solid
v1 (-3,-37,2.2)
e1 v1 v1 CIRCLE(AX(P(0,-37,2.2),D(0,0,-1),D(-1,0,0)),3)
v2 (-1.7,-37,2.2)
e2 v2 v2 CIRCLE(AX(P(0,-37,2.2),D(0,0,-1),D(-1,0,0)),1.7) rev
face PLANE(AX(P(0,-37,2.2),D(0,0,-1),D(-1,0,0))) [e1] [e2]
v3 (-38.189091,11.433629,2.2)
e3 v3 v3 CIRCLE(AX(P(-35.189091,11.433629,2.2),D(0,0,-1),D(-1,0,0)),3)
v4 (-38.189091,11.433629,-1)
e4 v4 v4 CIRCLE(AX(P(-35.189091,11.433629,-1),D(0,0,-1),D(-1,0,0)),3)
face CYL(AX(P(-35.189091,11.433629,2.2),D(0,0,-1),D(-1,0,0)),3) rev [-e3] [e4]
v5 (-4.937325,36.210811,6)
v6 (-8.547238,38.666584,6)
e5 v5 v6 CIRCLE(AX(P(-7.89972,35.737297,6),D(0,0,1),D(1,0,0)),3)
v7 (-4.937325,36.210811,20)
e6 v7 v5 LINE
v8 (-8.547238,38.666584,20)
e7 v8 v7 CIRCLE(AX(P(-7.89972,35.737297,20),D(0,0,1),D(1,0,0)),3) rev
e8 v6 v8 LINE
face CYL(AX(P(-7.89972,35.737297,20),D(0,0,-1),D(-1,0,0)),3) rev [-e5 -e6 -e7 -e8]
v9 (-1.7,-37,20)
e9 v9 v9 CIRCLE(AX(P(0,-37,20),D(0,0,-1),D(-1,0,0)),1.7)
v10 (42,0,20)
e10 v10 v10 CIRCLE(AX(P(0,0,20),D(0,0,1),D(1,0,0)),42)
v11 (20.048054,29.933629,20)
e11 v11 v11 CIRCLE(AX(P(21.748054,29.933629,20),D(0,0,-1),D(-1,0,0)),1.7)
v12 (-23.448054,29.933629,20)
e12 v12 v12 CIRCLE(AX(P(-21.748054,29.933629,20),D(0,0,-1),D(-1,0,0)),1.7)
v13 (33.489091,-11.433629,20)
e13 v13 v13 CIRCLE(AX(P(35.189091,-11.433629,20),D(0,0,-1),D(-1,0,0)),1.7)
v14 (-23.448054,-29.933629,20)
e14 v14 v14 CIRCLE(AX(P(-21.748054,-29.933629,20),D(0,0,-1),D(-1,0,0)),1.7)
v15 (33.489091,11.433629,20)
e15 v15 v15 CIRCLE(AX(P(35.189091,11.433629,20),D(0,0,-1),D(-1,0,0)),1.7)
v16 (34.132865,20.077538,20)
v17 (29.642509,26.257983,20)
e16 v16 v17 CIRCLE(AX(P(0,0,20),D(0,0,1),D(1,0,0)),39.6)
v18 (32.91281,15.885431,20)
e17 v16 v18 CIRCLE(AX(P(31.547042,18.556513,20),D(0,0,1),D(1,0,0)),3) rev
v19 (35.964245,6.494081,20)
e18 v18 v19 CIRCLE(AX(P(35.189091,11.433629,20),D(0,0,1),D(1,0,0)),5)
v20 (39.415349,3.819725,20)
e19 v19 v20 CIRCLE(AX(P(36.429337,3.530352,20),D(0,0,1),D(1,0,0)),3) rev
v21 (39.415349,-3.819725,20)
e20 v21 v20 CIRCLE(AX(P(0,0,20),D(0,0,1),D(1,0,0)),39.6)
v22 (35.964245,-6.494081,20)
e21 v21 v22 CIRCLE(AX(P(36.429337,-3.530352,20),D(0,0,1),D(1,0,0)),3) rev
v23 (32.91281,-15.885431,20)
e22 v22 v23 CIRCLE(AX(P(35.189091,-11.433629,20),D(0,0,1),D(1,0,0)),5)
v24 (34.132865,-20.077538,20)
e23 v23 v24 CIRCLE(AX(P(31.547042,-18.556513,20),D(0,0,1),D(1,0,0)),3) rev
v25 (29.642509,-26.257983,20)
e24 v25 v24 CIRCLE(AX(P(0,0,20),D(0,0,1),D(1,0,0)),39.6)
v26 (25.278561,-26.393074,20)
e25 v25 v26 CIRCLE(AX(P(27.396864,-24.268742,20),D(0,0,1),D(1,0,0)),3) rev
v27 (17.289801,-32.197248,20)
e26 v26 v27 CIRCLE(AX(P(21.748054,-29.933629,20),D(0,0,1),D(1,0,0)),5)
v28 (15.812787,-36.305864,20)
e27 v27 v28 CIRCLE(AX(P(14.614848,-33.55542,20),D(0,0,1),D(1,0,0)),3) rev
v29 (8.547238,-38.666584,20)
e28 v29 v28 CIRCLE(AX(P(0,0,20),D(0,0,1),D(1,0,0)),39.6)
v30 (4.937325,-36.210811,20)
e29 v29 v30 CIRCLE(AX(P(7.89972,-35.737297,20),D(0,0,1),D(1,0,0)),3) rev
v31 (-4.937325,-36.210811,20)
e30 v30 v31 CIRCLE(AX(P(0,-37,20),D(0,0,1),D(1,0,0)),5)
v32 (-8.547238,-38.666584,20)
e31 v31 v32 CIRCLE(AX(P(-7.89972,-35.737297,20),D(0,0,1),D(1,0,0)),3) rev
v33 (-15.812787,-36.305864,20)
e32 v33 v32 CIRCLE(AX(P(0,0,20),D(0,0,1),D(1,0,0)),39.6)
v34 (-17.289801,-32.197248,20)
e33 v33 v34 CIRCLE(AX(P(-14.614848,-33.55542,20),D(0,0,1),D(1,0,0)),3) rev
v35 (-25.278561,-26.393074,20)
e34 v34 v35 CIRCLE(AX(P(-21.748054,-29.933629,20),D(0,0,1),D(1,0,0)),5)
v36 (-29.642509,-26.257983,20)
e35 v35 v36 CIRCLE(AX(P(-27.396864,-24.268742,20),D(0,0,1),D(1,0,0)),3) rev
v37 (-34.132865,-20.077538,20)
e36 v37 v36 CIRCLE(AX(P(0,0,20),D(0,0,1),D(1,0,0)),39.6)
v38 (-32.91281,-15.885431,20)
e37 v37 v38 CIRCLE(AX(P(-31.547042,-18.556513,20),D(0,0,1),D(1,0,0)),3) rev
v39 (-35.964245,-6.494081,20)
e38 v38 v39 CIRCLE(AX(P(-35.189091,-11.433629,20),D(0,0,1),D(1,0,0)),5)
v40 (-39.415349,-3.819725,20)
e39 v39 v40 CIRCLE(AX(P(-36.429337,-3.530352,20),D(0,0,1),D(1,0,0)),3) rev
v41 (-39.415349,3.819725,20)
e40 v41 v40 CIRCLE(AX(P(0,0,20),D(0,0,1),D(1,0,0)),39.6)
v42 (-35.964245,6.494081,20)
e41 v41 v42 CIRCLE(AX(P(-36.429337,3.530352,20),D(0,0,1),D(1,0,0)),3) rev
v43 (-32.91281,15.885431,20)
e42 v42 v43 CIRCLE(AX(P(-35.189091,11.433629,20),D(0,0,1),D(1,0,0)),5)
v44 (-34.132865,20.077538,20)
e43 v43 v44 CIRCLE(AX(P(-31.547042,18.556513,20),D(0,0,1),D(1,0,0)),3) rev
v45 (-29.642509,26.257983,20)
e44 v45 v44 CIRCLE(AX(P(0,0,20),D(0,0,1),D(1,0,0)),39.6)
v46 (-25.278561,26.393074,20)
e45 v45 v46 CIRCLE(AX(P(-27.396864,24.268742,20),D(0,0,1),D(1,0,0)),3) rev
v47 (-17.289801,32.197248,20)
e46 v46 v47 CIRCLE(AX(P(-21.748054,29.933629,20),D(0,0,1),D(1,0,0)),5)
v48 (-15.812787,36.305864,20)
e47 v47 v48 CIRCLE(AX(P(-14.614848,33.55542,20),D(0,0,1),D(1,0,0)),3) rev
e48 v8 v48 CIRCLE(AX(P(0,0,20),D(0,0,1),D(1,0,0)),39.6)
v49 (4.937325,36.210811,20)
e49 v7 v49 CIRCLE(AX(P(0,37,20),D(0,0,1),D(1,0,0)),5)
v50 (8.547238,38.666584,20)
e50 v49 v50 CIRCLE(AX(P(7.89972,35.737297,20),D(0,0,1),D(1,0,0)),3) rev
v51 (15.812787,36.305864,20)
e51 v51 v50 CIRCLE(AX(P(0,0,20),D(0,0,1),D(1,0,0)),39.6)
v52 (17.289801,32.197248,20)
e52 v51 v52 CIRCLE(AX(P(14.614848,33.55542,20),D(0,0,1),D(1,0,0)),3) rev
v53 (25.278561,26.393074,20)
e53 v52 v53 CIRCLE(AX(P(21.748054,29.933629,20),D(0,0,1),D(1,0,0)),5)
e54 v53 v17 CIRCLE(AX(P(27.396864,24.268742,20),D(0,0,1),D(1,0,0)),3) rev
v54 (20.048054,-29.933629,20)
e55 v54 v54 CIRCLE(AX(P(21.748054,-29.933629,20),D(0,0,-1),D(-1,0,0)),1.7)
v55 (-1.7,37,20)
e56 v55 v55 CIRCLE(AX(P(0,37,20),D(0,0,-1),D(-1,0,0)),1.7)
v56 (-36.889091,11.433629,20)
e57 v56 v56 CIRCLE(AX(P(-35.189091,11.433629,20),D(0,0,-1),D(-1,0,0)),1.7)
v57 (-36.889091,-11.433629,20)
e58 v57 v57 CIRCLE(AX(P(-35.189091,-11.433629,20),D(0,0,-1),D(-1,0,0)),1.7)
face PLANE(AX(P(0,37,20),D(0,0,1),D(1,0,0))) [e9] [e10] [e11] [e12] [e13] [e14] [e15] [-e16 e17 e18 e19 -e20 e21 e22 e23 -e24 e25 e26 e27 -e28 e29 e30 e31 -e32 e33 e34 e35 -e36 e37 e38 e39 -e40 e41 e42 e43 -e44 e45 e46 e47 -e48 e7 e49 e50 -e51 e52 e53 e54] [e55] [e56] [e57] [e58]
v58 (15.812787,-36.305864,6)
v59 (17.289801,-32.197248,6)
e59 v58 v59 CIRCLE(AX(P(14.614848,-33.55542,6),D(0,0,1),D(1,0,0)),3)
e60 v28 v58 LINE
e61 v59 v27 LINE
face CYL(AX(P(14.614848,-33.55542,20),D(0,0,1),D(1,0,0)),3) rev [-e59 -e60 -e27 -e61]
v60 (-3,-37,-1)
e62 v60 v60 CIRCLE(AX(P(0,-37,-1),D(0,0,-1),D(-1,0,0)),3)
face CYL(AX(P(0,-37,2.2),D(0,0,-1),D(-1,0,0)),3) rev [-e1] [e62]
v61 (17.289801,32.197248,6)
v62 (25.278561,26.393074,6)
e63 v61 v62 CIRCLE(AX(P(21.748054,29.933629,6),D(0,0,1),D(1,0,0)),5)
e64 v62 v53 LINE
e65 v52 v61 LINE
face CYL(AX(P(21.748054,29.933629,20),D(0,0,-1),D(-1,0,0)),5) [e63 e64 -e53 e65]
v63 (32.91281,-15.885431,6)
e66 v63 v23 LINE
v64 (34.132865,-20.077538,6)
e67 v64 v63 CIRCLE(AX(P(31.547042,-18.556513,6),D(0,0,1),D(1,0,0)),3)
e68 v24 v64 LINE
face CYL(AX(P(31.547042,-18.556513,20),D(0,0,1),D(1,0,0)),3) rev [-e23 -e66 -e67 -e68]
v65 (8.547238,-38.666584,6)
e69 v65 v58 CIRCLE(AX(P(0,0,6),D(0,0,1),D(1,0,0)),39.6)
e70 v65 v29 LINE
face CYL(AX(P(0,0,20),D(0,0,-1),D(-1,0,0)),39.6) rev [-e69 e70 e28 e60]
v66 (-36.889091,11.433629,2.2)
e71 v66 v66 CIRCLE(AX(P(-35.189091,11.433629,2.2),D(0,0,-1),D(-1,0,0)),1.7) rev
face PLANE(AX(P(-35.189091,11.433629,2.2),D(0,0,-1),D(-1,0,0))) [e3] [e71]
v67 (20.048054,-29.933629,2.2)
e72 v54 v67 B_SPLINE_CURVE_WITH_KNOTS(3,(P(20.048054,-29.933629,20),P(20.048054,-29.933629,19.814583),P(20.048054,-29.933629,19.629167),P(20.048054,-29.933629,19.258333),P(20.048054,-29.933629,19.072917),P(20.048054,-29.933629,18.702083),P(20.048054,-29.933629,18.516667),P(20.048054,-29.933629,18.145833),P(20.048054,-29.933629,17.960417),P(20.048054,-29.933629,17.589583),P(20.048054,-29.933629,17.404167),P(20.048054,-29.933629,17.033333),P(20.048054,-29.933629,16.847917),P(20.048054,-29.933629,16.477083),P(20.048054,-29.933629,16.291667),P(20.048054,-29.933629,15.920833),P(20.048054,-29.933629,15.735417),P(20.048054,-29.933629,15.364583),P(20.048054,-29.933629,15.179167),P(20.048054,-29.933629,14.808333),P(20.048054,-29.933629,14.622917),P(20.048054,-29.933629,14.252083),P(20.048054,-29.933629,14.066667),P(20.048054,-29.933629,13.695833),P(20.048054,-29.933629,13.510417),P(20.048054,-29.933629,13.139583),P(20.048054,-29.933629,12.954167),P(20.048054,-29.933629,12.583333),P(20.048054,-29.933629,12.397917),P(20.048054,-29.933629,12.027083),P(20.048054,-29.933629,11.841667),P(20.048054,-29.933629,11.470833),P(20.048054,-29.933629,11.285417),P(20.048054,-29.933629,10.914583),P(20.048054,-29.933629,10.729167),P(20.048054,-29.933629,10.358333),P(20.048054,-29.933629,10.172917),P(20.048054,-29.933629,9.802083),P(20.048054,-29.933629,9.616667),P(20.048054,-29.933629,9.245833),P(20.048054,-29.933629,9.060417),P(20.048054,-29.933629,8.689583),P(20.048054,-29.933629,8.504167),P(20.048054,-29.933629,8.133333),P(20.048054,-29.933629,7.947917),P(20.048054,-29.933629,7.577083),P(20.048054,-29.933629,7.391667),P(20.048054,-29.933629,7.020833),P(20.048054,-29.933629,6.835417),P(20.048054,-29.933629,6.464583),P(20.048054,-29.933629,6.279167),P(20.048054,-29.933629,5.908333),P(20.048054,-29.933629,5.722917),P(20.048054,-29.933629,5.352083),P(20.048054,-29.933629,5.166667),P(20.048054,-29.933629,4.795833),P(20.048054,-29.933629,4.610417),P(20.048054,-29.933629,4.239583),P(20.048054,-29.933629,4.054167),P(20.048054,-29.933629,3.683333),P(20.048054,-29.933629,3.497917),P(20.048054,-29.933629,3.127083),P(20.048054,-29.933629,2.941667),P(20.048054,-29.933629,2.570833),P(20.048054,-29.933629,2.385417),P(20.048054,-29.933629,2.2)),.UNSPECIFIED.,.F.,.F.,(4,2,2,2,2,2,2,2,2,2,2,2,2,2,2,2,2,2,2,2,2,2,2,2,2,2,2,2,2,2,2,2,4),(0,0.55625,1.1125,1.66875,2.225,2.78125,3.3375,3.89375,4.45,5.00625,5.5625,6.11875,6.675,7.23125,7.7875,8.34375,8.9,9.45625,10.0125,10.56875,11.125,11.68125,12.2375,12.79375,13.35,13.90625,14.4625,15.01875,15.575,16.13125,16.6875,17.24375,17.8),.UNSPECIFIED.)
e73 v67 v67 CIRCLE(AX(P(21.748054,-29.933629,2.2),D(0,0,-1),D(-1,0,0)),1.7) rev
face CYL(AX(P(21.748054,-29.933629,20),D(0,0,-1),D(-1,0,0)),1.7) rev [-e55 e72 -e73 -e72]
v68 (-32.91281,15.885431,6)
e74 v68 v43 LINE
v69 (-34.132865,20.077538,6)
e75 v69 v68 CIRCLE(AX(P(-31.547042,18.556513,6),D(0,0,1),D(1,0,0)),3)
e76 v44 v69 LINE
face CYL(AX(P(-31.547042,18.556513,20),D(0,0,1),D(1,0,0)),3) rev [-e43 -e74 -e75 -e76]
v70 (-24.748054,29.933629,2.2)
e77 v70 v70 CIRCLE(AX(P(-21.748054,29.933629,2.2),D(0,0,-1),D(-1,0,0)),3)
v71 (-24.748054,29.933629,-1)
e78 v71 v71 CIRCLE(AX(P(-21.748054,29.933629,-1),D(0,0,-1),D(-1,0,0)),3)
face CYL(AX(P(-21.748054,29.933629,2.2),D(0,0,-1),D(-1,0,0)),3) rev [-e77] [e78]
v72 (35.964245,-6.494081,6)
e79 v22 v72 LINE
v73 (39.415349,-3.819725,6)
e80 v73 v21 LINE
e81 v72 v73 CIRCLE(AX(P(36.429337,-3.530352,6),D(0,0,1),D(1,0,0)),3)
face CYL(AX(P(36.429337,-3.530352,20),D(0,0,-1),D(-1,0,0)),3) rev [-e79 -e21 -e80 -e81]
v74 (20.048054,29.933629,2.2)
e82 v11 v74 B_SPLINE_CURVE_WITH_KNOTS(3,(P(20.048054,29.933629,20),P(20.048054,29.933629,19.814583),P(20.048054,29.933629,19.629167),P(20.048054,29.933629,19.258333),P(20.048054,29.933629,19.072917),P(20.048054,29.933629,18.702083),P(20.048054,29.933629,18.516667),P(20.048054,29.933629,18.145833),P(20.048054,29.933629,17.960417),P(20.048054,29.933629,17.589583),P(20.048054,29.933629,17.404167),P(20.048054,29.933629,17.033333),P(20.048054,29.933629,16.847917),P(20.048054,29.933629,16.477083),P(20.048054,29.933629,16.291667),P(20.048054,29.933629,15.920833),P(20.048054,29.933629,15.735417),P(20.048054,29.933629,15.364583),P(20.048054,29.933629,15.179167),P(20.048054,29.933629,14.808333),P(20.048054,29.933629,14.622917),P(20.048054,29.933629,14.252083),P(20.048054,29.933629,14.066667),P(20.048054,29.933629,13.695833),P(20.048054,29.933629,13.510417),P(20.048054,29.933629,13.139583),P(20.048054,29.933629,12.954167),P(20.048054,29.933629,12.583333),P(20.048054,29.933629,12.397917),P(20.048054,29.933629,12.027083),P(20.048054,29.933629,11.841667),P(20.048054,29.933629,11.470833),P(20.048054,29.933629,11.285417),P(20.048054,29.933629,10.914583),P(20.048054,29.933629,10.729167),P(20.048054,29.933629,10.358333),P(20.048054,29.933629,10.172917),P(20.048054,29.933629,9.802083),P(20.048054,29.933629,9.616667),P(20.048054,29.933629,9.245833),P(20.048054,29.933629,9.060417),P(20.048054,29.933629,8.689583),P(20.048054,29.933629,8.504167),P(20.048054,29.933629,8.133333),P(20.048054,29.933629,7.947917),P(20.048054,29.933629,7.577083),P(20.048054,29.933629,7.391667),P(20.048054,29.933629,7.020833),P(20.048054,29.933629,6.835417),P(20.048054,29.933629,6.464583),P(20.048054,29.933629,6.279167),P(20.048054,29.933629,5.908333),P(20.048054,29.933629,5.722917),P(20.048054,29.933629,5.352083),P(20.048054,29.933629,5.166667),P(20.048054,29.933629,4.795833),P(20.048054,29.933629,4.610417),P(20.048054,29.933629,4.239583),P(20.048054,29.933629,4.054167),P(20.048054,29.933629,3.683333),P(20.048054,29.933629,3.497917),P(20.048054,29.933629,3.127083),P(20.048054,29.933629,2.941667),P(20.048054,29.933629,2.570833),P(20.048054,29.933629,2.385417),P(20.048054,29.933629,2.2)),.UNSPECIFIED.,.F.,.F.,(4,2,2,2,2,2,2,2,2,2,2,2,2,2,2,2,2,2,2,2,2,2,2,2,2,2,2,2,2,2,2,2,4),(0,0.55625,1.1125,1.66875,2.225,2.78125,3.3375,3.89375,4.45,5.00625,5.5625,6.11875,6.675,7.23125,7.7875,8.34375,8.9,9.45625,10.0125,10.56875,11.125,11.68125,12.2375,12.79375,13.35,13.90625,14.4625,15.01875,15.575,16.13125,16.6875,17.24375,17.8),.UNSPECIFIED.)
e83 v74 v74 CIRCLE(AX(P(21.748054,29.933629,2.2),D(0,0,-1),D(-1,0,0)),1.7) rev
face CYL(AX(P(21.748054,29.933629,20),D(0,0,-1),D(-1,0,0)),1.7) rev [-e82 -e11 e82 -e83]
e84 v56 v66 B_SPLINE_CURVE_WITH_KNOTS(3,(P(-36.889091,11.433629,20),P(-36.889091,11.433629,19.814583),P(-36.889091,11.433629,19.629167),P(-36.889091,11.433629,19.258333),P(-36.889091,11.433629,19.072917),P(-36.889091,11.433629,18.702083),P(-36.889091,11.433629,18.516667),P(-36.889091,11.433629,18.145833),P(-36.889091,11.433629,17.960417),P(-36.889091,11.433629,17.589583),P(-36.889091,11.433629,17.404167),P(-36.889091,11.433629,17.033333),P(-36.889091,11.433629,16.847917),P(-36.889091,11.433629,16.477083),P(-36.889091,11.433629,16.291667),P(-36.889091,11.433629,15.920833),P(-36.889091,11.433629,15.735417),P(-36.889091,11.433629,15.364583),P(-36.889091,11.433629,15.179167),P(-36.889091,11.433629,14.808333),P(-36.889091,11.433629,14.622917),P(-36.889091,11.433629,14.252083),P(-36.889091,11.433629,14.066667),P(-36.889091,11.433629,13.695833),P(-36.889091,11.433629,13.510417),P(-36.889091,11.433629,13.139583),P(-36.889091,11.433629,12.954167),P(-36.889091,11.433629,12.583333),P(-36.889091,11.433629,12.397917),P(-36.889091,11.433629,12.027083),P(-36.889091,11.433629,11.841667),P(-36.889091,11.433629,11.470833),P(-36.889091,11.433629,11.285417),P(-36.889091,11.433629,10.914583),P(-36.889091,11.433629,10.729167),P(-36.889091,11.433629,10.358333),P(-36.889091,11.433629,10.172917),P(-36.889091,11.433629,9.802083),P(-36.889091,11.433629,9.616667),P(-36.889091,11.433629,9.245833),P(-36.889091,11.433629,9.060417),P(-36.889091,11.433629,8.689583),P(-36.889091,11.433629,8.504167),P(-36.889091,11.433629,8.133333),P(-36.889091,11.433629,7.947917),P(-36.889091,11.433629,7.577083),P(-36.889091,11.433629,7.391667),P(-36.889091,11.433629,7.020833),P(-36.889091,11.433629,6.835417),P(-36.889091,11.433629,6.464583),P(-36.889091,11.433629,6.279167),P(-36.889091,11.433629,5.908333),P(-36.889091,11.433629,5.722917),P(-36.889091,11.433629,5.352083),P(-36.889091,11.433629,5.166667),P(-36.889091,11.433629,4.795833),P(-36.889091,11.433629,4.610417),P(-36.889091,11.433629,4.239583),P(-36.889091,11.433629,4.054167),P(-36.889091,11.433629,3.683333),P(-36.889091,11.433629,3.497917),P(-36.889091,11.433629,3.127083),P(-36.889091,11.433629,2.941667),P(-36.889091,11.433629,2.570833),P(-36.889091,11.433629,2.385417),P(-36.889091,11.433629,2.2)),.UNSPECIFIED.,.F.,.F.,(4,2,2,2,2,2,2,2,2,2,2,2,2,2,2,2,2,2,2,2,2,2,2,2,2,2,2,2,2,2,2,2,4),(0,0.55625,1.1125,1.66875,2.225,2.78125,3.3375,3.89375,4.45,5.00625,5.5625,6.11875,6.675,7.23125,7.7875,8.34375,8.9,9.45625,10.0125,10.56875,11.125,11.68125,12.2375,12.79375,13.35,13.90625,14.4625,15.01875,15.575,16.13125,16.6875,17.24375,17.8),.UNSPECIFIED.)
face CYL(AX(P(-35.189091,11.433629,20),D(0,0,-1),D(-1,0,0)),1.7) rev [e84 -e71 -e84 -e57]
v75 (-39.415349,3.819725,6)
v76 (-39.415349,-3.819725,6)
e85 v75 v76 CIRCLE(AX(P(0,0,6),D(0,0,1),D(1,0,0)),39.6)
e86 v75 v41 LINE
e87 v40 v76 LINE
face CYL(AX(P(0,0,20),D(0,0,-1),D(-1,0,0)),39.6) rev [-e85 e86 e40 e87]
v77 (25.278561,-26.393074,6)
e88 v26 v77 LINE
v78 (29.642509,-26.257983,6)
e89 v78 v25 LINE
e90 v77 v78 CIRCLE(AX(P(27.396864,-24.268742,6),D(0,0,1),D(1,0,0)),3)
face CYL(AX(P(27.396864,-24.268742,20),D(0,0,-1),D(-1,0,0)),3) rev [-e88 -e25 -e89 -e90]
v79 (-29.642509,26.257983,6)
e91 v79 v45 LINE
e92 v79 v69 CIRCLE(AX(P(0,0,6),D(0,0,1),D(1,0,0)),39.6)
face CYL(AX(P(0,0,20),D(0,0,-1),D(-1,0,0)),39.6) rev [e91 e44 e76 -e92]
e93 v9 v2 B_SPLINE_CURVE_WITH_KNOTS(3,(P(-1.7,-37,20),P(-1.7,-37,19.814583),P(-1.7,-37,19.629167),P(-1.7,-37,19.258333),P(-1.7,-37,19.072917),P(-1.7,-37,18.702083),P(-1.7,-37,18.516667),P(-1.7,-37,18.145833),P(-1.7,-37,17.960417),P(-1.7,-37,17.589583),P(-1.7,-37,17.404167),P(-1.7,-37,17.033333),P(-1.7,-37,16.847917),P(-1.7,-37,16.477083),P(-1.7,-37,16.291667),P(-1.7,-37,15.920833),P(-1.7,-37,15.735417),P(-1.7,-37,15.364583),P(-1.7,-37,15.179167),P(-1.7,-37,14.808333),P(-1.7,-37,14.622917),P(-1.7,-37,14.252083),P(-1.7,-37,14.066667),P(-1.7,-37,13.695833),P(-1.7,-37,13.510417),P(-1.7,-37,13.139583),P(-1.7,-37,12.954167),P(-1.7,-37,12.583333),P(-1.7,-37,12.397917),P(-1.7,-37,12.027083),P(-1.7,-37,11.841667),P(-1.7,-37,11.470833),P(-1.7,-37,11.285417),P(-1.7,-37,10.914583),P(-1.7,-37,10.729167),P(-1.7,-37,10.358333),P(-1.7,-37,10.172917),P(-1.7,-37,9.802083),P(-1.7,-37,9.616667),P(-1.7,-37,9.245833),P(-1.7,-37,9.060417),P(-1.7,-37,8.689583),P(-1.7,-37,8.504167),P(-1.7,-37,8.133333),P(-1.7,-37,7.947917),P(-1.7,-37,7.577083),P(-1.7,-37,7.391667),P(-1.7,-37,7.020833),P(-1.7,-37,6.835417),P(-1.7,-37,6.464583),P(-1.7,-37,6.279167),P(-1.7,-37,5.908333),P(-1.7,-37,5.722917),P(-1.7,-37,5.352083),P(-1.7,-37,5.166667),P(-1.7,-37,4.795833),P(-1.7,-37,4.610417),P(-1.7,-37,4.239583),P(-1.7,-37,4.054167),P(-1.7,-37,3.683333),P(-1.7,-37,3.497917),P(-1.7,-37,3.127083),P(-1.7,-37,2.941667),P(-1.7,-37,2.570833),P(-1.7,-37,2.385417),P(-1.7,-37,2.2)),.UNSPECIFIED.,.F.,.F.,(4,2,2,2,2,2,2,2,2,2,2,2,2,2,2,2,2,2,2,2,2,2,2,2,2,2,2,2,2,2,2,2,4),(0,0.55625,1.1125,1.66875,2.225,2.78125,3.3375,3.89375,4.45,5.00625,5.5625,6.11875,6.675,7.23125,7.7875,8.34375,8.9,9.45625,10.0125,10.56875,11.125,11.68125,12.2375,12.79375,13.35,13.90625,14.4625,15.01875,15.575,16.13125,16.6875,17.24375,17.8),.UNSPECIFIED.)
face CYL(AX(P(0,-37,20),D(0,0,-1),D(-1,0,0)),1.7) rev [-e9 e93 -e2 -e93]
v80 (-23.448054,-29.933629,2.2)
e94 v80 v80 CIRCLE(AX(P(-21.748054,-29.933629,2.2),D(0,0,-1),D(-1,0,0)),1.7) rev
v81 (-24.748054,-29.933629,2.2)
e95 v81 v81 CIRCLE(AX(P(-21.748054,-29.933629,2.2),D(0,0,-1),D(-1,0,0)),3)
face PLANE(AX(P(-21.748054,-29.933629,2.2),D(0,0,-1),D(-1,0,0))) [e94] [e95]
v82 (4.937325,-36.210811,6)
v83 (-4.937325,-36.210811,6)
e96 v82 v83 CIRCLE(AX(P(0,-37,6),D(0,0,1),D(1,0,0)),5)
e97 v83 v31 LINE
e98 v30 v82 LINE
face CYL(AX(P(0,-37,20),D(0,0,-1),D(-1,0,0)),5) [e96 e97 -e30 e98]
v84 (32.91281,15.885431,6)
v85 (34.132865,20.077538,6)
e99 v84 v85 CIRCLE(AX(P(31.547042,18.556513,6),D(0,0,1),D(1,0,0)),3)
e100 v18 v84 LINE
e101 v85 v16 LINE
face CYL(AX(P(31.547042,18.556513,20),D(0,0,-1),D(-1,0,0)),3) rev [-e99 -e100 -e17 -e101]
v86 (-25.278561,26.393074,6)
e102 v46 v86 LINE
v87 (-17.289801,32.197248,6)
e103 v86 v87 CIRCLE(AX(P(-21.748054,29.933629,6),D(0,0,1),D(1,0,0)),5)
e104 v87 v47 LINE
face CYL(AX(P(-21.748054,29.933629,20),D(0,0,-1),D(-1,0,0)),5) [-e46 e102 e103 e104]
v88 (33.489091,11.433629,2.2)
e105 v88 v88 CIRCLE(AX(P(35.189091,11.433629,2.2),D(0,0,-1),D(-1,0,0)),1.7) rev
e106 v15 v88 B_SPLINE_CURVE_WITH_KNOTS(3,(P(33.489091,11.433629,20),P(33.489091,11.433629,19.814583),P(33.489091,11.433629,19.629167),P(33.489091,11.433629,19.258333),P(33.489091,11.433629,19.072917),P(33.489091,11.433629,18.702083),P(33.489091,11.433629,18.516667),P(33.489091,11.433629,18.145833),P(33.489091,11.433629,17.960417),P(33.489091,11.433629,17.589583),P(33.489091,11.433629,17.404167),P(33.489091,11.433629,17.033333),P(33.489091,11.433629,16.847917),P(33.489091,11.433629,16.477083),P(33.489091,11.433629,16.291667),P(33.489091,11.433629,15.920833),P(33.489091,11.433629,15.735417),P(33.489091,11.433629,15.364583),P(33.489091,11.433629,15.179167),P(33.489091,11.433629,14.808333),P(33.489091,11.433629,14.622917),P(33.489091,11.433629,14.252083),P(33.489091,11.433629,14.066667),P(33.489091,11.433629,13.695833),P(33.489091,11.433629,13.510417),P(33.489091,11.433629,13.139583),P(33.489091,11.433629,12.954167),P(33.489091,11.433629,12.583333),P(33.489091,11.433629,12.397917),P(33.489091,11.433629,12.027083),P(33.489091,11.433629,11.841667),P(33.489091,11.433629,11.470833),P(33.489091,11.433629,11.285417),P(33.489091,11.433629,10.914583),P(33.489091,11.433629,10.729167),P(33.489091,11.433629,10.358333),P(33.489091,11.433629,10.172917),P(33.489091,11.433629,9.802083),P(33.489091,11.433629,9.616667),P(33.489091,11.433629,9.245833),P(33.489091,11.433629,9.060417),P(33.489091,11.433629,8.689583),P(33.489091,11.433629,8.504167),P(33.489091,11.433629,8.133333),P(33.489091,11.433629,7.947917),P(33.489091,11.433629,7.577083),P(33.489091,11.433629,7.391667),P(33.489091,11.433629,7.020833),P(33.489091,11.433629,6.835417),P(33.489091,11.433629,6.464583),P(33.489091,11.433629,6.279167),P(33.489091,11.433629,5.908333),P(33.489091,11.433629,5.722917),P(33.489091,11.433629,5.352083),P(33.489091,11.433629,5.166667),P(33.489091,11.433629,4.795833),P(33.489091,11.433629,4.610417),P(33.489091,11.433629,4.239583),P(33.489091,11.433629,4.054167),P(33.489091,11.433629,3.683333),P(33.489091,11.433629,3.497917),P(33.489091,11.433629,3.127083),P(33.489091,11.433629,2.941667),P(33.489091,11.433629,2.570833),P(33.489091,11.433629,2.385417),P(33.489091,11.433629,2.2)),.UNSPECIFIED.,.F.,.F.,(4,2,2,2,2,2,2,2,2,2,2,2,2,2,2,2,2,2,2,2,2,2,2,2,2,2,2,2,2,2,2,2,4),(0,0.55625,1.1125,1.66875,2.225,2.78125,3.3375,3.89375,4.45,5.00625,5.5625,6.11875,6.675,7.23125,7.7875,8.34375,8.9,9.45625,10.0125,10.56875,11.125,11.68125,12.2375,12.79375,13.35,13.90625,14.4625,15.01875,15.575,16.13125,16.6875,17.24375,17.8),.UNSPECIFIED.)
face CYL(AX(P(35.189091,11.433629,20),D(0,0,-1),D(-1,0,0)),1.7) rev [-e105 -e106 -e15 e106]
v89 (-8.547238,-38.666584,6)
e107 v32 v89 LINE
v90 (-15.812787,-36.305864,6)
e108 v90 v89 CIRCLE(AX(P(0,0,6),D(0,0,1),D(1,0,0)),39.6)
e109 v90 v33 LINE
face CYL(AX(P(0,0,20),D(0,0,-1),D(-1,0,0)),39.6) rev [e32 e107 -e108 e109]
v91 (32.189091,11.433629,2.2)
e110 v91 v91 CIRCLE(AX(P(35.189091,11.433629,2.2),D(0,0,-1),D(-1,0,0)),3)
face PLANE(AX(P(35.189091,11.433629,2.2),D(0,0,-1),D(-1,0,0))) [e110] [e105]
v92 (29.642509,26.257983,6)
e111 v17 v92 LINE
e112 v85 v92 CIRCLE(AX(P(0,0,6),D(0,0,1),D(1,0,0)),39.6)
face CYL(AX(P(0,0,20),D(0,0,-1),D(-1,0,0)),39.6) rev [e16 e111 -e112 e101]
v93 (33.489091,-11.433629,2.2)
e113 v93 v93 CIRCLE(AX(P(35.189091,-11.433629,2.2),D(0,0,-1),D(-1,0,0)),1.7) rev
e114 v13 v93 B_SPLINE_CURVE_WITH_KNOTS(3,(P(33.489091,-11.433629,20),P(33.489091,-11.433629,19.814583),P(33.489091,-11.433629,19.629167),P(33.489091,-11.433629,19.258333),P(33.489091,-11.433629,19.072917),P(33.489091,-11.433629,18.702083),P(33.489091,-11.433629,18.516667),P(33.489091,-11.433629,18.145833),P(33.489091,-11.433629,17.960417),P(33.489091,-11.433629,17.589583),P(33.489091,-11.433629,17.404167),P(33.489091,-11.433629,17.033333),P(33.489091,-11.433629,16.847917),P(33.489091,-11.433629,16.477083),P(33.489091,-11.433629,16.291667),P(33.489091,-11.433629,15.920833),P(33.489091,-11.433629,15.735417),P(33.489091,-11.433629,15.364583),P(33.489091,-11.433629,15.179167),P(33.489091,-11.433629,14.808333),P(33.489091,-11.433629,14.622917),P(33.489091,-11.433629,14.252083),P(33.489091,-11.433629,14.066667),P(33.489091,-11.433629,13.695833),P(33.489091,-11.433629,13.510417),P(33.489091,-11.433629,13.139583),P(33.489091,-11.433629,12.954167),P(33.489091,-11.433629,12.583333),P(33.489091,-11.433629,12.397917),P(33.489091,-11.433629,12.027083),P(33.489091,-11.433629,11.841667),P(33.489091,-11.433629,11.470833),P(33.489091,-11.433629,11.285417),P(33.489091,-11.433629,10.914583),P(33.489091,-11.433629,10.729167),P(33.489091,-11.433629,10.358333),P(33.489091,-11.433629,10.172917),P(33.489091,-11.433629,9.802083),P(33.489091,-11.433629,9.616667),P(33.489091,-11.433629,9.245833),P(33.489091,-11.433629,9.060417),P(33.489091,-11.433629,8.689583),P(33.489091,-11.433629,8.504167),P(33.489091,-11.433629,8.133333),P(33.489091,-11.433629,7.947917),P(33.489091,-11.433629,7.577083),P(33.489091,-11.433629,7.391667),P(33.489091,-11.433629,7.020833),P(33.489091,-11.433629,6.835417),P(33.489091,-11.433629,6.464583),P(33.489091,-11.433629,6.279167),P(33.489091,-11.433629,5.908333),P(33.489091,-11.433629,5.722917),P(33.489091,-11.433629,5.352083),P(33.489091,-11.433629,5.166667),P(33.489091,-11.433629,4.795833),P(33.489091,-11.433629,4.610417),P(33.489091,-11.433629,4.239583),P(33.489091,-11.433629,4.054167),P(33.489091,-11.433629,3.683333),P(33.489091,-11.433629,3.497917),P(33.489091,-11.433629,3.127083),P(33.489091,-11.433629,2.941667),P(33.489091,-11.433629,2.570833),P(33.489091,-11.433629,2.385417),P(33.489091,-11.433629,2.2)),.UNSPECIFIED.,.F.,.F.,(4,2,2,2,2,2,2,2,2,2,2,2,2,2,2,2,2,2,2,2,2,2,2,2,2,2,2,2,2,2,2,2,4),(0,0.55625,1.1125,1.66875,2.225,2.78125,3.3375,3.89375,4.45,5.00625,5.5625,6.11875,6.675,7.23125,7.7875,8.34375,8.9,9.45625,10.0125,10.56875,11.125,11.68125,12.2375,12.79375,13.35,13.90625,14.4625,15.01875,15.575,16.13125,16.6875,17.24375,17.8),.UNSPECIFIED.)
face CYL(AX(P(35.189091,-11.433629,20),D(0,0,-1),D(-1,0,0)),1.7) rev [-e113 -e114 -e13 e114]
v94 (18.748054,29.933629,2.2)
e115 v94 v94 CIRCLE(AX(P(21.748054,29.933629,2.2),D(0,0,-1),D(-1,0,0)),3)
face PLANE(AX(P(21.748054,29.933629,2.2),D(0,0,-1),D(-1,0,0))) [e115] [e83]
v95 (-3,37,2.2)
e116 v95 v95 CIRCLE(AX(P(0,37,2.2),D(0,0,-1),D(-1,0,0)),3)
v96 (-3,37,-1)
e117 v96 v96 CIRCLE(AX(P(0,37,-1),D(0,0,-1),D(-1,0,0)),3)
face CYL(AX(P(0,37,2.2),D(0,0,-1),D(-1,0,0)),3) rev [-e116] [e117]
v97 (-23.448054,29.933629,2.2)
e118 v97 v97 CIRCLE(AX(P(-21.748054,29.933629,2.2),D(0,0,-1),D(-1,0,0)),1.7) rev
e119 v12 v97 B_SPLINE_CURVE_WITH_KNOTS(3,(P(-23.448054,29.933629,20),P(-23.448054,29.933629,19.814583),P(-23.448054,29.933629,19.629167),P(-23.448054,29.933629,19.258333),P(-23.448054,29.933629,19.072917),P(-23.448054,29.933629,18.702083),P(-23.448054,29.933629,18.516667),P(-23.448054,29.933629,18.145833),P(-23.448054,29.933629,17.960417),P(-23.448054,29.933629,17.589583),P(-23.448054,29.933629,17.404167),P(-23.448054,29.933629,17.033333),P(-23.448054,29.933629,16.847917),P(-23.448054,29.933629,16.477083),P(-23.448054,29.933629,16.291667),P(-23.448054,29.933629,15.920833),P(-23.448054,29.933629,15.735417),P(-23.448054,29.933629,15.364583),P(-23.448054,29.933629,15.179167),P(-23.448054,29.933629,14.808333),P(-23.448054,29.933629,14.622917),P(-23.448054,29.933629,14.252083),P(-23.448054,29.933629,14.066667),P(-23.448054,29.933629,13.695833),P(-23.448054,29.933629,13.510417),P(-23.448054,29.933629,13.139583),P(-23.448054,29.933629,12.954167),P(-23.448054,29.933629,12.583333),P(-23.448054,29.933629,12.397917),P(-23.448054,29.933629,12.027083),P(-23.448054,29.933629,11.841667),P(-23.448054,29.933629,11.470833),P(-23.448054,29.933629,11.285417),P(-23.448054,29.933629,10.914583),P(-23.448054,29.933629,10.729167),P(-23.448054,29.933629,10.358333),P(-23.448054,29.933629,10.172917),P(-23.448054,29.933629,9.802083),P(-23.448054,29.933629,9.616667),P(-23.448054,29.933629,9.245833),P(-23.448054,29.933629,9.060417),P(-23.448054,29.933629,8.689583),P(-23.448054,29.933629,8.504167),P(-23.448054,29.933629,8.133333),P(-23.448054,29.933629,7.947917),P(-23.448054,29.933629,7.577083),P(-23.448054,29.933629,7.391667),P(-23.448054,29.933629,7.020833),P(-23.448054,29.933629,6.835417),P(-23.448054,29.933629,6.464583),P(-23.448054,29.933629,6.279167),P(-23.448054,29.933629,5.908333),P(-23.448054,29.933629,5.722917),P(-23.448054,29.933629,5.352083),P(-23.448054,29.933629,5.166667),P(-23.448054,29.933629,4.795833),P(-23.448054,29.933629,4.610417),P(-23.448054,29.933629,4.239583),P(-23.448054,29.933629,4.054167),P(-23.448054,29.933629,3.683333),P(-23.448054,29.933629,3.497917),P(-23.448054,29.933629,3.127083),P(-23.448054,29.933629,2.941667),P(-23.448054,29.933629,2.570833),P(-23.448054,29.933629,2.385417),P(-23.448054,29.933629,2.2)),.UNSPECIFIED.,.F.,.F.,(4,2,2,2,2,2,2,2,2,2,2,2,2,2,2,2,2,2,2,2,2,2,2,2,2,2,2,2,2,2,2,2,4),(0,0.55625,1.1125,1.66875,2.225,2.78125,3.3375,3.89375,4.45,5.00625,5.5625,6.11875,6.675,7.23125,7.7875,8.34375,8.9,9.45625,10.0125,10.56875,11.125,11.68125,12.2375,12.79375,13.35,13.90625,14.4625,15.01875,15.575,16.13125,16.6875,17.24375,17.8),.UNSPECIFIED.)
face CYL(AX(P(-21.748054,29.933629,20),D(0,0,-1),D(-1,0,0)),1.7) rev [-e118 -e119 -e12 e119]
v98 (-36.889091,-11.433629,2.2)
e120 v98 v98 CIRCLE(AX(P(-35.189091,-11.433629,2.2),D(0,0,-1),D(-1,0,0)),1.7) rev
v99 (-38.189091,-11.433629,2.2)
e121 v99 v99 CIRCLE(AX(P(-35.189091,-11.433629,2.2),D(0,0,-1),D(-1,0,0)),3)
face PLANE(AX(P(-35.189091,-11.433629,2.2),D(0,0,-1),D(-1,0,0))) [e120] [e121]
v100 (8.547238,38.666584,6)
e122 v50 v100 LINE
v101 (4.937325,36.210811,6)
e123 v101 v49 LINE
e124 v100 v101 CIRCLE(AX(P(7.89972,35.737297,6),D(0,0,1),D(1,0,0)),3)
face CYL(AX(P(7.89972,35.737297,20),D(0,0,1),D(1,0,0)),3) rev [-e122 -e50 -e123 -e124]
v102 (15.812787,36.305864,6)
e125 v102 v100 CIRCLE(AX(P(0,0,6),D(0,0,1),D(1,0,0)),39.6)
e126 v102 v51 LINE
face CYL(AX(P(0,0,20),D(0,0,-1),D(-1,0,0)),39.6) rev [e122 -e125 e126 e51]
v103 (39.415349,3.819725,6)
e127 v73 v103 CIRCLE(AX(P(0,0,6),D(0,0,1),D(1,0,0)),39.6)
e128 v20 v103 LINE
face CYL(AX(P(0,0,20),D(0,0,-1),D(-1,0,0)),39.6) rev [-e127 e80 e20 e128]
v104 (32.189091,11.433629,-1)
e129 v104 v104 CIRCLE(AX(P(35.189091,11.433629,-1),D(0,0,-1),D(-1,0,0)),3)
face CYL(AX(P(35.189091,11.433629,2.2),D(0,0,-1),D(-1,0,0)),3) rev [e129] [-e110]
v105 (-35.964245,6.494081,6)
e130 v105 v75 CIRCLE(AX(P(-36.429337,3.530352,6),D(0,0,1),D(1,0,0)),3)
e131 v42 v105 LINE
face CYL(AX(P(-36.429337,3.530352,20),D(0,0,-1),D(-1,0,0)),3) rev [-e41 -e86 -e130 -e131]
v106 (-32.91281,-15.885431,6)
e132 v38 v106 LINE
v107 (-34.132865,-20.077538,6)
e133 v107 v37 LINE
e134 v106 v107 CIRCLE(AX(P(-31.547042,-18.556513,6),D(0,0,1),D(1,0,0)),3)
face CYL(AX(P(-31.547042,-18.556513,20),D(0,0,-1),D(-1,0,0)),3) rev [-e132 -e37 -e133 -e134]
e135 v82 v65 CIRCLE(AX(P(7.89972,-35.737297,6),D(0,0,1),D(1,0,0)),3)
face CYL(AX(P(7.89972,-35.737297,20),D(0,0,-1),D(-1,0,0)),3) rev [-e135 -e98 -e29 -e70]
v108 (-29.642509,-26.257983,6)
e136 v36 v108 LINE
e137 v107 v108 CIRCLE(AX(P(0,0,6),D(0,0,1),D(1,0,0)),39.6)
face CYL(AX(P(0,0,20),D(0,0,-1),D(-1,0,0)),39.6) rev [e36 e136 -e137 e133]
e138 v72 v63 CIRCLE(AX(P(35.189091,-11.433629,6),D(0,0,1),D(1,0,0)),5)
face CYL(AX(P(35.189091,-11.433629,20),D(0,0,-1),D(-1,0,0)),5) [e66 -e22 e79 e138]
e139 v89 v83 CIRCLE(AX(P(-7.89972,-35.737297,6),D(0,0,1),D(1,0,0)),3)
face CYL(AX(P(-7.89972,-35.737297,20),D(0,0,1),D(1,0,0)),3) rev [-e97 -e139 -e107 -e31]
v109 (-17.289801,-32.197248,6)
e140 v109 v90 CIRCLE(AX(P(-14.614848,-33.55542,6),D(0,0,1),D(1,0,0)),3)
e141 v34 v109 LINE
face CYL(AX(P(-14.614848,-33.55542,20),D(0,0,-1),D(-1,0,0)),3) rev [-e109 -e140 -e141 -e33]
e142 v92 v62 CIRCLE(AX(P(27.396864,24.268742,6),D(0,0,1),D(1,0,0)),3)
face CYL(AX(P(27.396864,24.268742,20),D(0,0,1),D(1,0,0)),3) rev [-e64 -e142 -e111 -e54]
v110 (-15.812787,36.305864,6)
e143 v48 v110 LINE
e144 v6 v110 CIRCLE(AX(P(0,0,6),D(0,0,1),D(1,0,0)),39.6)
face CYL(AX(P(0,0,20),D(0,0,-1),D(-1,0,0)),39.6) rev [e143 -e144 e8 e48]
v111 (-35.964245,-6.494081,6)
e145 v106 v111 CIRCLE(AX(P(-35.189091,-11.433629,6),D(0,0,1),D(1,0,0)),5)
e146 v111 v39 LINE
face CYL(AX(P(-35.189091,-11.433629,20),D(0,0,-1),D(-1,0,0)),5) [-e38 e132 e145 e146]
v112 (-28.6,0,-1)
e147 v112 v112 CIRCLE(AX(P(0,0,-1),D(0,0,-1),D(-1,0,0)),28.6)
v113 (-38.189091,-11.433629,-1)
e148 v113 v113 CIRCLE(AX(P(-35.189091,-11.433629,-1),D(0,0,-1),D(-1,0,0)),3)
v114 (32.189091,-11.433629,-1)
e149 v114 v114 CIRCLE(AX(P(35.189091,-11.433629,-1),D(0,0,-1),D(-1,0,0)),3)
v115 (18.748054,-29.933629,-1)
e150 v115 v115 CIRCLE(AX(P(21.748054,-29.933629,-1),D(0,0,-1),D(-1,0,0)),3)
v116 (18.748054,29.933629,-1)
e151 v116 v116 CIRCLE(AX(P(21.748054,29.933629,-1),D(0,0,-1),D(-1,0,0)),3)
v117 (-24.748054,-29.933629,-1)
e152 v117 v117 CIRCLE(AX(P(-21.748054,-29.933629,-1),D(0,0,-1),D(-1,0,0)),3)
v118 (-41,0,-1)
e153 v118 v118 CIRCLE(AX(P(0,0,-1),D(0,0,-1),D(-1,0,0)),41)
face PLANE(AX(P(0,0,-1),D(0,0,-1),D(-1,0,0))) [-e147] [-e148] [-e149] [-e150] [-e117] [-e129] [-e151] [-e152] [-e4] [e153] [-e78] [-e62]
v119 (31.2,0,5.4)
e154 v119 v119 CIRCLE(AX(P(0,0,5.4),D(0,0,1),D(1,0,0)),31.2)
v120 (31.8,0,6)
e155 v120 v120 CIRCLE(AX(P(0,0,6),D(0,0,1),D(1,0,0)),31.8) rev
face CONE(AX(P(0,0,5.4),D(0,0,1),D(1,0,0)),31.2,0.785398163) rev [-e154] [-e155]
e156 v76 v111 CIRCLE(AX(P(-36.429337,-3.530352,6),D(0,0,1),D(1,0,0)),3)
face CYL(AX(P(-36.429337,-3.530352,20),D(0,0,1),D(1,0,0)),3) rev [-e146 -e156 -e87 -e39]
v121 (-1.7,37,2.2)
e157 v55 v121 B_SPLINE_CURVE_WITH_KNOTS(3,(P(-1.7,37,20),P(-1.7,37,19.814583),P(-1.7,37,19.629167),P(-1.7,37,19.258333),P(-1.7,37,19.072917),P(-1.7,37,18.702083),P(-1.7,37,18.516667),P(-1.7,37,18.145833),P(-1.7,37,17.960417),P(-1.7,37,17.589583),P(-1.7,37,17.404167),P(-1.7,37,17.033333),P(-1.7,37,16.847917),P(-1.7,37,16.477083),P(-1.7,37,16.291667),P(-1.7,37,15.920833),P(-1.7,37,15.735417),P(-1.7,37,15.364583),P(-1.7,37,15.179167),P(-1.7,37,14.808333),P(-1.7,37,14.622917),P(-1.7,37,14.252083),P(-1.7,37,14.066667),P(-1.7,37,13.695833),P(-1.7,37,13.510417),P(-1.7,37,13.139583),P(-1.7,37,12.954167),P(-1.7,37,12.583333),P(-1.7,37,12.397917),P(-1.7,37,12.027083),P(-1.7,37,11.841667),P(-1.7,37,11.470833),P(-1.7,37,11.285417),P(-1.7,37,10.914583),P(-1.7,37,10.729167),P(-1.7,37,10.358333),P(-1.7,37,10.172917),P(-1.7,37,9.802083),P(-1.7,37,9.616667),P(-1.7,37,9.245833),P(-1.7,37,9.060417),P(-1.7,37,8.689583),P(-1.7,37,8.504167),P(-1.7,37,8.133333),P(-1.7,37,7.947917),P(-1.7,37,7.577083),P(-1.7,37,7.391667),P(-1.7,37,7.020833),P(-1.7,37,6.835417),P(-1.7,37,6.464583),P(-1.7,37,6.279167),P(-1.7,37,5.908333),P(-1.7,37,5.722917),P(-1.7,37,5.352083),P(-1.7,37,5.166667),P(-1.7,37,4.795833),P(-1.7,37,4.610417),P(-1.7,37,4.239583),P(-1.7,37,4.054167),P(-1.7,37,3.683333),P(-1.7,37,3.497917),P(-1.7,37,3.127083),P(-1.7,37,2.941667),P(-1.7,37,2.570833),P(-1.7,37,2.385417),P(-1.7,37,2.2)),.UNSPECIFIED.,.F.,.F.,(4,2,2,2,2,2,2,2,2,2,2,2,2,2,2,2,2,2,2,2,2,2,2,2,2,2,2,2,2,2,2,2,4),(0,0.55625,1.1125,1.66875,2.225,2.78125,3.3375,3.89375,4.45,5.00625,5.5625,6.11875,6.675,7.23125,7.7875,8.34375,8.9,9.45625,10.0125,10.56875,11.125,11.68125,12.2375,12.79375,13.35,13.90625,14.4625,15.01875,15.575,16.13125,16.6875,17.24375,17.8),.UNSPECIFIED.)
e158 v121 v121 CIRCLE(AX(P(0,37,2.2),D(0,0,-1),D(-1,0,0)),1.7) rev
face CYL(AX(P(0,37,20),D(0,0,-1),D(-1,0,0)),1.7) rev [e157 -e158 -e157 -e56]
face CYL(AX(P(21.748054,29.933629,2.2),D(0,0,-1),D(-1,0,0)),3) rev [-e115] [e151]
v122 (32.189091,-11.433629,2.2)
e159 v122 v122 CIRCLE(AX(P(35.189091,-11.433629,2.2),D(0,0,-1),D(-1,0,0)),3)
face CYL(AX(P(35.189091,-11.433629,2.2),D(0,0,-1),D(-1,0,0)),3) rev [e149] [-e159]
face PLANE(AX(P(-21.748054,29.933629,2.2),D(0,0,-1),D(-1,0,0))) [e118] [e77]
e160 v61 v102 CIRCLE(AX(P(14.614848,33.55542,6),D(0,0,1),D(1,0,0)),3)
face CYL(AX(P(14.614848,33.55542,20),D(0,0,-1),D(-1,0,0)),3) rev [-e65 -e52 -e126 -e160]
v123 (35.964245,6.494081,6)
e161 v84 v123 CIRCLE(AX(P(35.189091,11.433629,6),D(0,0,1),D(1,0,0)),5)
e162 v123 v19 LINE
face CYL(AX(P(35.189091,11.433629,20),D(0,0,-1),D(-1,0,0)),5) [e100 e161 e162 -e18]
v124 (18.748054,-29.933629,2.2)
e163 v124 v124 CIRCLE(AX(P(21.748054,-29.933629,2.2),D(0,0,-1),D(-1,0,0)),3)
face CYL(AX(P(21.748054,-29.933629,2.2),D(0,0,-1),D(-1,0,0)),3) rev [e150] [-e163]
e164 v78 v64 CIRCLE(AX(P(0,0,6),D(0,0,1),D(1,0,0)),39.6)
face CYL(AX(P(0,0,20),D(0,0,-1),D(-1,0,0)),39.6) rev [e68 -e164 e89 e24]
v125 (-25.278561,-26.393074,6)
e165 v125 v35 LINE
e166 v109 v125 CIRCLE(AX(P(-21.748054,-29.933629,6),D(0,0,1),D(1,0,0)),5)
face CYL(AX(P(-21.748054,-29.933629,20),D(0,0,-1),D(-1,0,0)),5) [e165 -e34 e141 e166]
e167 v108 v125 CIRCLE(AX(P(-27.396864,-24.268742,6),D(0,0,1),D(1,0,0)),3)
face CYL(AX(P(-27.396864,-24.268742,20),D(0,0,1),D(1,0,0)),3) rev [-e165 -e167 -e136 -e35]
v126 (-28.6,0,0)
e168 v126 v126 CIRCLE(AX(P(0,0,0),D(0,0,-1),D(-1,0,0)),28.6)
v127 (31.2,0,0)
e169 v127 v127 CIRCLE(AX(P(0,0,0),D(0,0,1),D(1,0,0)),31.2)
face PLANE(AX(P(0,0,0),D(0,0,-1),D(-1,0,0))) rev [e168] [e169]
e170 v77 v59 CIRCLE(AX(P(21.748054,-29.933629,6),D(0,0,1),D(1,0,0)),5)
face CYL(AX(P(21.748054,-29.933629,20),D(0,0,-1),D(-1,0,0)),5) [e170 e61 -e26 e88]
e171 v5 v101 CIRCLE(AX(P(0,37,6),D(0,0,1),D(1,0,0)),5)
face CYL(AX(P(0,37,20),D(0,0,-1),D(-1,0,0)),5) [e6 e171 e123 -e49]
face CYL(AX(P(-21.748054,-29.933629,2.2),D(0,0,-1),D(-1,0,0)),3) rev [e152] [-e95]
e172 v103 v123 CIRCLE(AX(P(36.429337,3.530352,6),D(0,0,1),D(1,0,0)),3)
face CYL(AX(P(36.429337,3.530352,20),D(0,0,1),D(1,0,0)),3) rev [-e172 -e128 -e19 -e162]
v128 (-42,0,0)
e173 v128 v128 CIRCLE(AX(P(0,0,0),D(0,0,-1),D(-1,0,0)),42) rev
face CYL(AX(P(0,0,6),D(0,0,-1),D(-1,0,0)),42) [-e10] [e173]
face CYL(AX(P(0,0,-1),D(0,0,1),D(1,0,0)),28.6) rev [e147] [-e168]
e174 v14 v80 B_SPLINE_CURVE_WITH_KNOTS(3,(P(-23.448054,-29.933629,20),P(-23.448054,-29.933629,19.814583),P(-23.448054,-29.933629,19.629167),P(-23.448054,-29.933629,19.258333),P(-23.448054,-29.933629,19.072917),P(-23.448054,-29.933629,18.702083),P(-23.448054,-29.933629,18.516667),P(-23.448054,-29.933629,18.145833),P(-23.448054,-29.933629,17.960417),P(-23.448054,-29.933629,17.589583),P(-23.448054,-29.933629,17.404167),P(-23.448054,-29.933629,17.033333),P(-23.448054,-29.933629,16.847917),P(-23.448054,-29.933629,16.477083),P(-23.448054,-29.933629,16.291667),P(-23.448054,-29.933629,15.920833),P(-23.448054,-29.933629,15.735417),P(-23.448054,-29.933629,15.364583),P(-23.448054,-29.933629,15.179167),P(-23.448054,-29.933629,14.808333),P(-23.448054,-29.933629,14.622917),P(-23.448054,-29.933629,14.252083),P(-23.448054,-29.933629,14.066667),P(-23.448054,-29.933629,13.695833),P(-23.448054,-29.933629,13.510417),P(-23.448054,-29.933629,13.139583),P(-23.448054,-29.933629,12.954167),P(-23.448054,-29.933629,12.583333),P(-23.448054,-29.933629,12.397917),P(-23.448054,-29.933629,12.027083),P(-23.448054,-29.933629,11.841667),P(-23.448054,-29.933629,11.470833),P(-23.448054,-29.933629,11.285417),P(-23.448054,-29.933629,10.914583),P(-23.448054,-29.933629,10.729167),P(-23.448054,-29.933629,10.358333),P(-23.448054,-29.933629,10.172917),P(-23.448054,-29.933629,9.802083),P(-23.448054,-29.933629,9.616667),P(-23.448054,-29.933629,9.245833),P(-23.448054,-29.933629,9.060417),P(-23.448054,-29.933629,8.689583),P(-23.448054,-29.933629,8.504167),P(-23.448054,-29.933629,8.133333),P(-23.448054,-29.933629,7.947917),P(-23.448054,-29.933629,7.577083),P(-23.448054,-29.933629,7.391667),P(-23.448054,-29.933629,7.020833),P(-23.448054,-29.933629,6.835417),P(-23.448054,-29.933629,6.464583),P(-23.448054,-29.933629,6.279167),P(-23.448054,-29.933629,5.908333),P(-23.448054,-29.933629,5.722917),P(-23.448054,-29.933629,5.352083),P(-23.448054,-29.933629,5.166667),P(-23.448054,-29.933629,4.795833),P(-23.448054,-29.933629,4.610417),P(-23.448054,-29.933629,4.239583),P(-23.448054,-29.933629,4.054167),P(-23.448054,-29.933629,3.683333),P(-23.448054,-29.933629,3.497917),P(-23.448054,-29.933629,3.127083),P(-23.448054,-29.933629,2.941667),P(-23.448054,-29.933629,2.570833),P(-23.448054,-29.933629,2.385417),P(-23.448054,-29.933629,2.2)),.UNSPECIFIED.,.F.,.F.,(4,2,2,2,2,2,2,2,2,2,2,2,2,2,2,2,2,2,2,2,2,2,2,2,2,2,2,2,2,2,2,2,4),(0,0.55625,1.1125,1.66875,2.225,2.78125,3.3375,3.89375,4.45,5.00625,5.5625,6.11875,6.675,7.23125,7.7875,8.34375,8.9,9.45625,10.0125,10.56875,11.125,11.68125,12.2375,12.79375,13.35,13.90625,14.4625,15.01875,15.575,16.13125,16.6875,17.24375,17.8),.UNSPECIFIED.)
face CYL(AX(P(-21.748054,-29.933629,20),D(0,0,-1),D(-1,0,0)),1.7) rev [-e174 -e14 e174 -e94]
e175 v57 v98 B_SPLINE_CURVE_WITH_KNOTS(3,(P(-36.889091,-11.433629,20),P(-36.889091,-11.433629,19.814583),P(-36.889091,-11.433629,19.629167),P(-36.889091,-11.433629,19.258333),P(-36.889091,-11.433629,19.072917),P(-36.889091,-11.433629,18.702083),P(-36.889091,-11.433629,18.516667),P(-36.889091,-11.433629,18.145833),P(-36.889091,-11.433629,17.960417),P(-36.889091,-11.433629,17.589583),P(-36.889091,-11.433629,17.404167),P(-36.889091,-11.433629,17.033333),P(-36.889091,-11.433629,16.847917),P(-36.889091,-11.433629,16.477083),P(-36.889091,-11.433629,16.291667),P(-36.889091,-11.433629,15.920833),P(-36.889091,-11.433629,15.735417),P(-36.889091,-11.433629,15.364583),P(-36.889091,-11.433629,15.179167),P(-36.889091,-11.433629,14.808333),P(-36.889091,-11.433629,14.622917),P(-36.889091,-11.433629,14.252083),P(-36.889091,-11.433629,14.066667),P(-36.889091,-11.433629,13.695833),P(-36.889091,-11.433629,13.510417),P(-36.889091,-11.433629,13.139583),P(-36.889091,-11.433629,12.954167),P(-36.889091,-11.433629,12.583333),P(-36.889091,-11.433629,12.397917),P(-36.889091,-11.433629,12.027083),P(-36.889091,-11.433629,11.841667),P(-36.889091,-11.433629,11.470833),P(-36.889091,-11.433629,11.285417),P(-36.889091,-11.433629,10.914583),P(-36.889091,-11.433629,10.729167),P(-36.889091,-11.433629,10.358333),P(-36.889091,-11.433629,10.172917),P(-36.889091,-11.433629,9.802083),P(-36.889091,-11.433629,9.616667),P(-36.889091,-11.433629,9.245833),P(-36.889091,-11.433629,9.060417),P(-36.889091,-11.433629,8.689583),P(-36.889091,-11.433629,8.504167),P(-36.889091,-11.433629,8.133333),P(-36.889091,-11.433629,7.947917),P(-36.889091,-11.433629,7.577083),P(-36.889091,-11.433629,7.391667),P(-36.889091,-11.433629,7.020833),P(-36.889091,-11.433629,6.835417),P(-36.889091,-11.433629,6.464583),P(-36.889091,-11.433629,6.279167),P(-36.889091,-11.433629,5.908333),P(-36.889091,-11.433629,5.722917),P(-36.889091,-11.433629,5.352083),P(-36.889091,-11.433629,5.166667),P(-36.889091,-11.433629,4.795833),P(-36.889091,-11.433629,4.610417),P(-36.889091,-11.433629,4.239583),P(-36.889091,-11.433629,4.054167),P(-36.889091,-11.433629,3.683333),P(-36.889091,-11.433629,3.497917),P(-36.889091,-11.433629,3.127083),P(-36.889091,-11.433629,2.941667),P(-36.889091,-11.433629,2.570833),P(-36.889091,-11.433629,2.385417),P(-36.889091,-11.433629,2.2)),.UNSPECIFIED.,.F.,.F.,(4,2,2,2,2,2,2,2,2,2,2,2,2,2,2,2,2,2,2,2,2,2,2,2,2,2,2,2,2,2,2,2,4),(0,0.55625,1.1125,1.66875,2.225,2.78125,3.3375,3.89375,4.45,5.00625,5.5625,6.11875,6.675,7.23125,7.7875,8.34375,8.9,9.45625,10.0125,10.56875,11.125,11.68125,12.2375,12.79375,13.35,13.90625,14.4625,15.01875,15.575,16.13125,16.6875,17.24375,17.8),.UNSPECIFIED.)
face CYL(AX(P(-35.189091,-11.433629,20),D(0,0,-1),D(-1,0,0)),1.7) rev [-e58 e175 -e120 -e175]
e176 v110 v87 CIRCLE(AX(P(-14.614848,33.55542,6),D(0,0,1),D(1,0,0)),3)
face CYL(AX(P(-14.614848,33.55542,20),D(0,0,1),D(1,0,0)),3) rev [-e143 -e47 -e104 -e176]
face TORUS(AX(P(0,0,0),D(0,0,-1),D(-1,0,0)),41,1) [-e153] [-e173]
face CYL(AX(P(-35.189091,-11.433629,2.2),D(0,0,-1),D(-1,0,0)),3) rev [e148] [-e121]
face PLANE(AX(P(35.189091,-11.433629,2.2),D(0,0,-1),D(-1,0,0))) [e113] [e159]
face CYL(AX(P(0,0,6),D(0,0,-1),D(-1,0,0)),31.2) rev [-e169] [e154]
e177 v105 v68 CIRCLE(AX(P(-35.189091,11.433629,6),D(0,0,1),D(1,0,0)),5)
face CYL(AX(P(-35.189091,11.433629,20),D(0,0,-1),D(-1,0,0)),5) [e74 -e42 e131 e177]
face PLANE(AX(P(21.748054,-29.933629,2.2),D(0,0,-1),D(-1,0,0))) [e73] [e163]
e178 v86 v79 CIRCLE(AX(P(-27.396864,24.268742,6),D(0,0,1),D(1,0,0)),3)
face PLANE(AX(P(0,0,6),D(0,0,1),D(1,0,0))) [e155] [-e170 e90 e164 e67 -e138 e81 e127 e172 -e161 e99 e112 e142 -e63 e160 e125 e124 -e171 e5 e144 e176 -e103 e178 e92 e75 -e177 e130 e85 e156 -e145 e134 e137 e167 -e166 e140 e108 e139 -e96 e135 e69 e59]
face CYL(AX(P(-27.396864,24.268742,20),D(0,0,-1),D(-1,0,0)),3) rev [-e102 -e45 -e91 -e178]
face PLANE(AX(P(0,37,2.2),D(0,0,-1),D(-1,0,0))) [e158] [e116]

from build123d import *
from build123d.topology import SkipClean

# Parameters (mm, degrees)
ESQUISSE1_R             = 42
ESQUISSE1_R_2           = 31.2
BOSS_EXTRU_1_DEPTH      = 6
BOSS_EXTRU_2_START      = 1
ESQUISSE2_R             = 42
ESQUISSE2_R_2           = 28.6
BOSS_EXTRU_2_DEPTH      = 1
ESQUISSE3_R             = 5
BOSS_EXTRU_3_DEPTH      = 14
ESQUISSE4_R             = 42
ESQUISSE4_R_2           = 39.6
BOSS_EXTRU_4_DEPTH      = 14
CONG_1_R                = 3
ESQUISSE5_R             = 1.7
ENL_V_MAT_EXTRU_1_DEPTH = 64.000000167
ESQUISSE6_R             = 3
ENL_V_MAT_EXTRU_2_DEPTH = 3.2
CHANFREIN1_SIZE         = 0.6
CONG_2_R                = 1


with BuildPart() as part:
    # Esquisse1 → Boss.-Extru.1 (new body)
    with BuildSketch(Plane.XY):
        Circle(ESQUISSE1_R)
        Circle(ESQUISSE1_R_2, mode=Mode.SUBTRACT)
    extrude(amount=BOSS_EXTRU_1_DEPTH)

    # Esquisse2 → Boss.-Extru.2 (add)
    with BuildSketch(Plane(origin=(0, 0, 0), x_dir=(-1, 0, 0), z_dir=(0, 0, -1)).offset(BOSS_EXTRU_2_START)):
        Circle(ESQUISSE2_R)
        Circle(ESQUISSE2_R_2, mode=Mode.SUBTRACT)
    extrude(amount=-BOSS_EXTRU_2_DEPTH)

    # Esquisse3 → Boss.-Extru.3 (add)
    with BuildSketch(Plane.XY.offset(6)):
        with Locations(Location((0, 37, 0), (0, 0, 89.999613921))):
            Circle(ESQUISSE3_R)
        with Locations(Location((21.748054335, 29.933628792, 0), (0, 0, 53.999609041))):
            Circle(ESQUISSE3_R)
        with Locations(Location((35.189091103, 11.433628792, 0), (0, 0, 17.999603008))):
            Circle(ESQUISSE3_R)
        with Locations(Location((35.189091103, -11.433628792, 0), (0, 0, 341.999598271))):
            Circle(ESQUISSE3_R)
        with Locations(Location((21.748054335, -29.933628792, 0), (0, 0, 305.999596518))):
            Circle(ESQUISSE3_R)
        with Locations(Location((0, -37, 0), (0, 0, 269.999598257))):
            Circle(ESQUISSE3_R)
        with Locations(Location((-21.748054335, -29.933628792, 0), (0, 0, 233.999602875))):
            Circle(ESQUISSE3_R)
        with Locations(Location((-35.189091103, -11.433628792, 0), (0, 0, 197.999608525))):
            Circle(ESQUISSE3_R)
        with Locations(Location((-35.189091103, 11.433628792, 0), (0, 0, 161.99961318))):
            Circle(ESQUISSE3_R)
        with Locations(Location((-21.748054335, 29.933628792, 0), (0, 0, 125.999614883))):
            Circle(ESQUISSE3_R)
    extrude(amount=BOSS_EXTRU_3_DEPTH)

    # Esquisse4 → Boss.-Extru.4 (add)
    with SkipClean():  # the faces are left unmerged after this step: merging them gives an invalid solid
        with BuildSketch(Plane.XY.offset(6)):
            with Locations(Location((0, 0, 0), (0, 0, 180))):
                Circle(ESQUISSE4_R)
            Circle(ESQUISSE4_R_2, mode=Mode.SUBTRACT)
        extrude(amount=BOSS_EXTRU_4_DEPTH)

    # Congé1
    cong_1_edges = [part.edges().sort_by_distance(p)[0] for p in [
        (-4.411459412, 39.353513514, 13),
        (4.411459412, 39.353513514, 13),
        (19.562469235, 34.430652004, 13),
        (26.700360503, 29.244670437, 13),
        (36.064199538, 16.356451684, 13),
        (38.790631394, 7.965357244, 13),
        (38.790631394, -7.965357244, 13),
        (36.064199538, -16.356451684, 13),
        (26.700360503, -29.244670437, 13),
        (19.562469235, -34.430652004, 13),
        (4.411459412, -39.353513514, 13),
        (-4.411459412, -39.353513514, 13),
        (-19.562469235, -34.430652004, 13),
        (-26.700360503, -29.244670437, 13),
        (-36.064199538, -16.356451684, 13),
        (-38.790631394, -7.965357244, 13),
        (-38.790631394, 7.965357244, 13),
        (-36.064199538, 16.356451684, 13),
        (-26.700360503, 29.244670437, 13),
        (-19.562469235, 34.430652004, 13),
    ]]
    fillet(cong_1_edges, radius=CONG_1_R)

    # Esquisse5 → Enlèv. mat.-Extru.1 (cut, through all)
    with BuildSketch(Plane(origin=(0, 0, -1), x_dir=(-1, 0, 0), z_dir=(0, 0, -1))):
        with Locations((0, 37)):
            Circle(ESQUISSE5_R)
        with Locations((21.748054335, 29.933628792)):
            Circle(ESQUISSE5_R)
        with Locations((35.189091103, 11.433628792)):
            Circle(ESQUISSE5_R)
        with Locations((35.189091103, -11.433628792)):
            Circle(ESQUISSE5_R)
        with Locations((21.748054335, -29.933628792)):
            Circle(ESQUISSE5_R)
        with Locations((0, -37)):
            Circle(ESQUISSE5_R)
        with Locations((-21.748054335, -29.933628792)):
            Circle(ESQUISSE5_R)
        with Locations((-35.189091103, -11.433628792)):
            Circle(ESQUISSE5_R)
        with Locations((-35.189091103, 11.433628792)):
            Circle(ESQUISSE5_R)
        with Locations((-21.748054335, 29.933628792)):
            Circle(ESQUISSE5_R)
    extrude(amount=-ENL_V_MAT_EXTRU_1_DEPTH, mode=Mode.SUBTRACT)

    # Esquisse6 → Enlèv. mat.-Extru.2 (cut)
    with BuildSketch(Plane(origin=(0, 0, -1), x_dir=(-1, 0, 0), z_dir=(0, 0, -1))):
        with Locations((0, 37)):
            Circle(ESQUISSE6_R)
        with Locations((21.748054335, 29.933628792)):
            Circle(ESQUISSE6_R)
        with Locations((35.189091103, 11.433628792)):
            Circle(ESQUISSE6_R)
        with Locations((35.189091103, -11.433628792)):
            Circle(ESQUISSE6_R)
        with Locations((21.748054335, -29.933628792)):
            Circle(ESQUISSE6_R)
        with Locations((0, -37)):
            Circle(ESQUISSE6_R)
        with Locations((-21.748054335, -29.933628792)):
            Circle(ESQUISSE6_R)
        with Locations((-35.189091103, -11.433628792)):
            Circle(ESQUISSE6_R)
        with Locations((-35.189091103, 11.433628792)):
            Circle(ESQUISSE6_R)
        with Locations((-21.748054335, 29.933628792)):
            Circle(ESQUISSE6_R)
    extrude(amount=-ENL_V_MAT_EXTRU_2_DEPTH, mode=Mode.SUBTRACT)

    # Chanfrein1
    chanfrein1_edges = [part.edges().sort_by_distance(p)[0] for p in [
        (-31.2, 0, 6),
    ]]
    chamfer(chanfrein1_edges, length=CHANFREIN1_SIZE)

    # Congé2
    cong_2_edges = [part.edges().sort_by_distance(p)[0] for p in [
        (42, 0, -1),
    ]]
    fillet(cong_2_edges, radius=CONG_2_R - 0.0001)  # a hair under: the kernel refuses the full size


solid = part.part
